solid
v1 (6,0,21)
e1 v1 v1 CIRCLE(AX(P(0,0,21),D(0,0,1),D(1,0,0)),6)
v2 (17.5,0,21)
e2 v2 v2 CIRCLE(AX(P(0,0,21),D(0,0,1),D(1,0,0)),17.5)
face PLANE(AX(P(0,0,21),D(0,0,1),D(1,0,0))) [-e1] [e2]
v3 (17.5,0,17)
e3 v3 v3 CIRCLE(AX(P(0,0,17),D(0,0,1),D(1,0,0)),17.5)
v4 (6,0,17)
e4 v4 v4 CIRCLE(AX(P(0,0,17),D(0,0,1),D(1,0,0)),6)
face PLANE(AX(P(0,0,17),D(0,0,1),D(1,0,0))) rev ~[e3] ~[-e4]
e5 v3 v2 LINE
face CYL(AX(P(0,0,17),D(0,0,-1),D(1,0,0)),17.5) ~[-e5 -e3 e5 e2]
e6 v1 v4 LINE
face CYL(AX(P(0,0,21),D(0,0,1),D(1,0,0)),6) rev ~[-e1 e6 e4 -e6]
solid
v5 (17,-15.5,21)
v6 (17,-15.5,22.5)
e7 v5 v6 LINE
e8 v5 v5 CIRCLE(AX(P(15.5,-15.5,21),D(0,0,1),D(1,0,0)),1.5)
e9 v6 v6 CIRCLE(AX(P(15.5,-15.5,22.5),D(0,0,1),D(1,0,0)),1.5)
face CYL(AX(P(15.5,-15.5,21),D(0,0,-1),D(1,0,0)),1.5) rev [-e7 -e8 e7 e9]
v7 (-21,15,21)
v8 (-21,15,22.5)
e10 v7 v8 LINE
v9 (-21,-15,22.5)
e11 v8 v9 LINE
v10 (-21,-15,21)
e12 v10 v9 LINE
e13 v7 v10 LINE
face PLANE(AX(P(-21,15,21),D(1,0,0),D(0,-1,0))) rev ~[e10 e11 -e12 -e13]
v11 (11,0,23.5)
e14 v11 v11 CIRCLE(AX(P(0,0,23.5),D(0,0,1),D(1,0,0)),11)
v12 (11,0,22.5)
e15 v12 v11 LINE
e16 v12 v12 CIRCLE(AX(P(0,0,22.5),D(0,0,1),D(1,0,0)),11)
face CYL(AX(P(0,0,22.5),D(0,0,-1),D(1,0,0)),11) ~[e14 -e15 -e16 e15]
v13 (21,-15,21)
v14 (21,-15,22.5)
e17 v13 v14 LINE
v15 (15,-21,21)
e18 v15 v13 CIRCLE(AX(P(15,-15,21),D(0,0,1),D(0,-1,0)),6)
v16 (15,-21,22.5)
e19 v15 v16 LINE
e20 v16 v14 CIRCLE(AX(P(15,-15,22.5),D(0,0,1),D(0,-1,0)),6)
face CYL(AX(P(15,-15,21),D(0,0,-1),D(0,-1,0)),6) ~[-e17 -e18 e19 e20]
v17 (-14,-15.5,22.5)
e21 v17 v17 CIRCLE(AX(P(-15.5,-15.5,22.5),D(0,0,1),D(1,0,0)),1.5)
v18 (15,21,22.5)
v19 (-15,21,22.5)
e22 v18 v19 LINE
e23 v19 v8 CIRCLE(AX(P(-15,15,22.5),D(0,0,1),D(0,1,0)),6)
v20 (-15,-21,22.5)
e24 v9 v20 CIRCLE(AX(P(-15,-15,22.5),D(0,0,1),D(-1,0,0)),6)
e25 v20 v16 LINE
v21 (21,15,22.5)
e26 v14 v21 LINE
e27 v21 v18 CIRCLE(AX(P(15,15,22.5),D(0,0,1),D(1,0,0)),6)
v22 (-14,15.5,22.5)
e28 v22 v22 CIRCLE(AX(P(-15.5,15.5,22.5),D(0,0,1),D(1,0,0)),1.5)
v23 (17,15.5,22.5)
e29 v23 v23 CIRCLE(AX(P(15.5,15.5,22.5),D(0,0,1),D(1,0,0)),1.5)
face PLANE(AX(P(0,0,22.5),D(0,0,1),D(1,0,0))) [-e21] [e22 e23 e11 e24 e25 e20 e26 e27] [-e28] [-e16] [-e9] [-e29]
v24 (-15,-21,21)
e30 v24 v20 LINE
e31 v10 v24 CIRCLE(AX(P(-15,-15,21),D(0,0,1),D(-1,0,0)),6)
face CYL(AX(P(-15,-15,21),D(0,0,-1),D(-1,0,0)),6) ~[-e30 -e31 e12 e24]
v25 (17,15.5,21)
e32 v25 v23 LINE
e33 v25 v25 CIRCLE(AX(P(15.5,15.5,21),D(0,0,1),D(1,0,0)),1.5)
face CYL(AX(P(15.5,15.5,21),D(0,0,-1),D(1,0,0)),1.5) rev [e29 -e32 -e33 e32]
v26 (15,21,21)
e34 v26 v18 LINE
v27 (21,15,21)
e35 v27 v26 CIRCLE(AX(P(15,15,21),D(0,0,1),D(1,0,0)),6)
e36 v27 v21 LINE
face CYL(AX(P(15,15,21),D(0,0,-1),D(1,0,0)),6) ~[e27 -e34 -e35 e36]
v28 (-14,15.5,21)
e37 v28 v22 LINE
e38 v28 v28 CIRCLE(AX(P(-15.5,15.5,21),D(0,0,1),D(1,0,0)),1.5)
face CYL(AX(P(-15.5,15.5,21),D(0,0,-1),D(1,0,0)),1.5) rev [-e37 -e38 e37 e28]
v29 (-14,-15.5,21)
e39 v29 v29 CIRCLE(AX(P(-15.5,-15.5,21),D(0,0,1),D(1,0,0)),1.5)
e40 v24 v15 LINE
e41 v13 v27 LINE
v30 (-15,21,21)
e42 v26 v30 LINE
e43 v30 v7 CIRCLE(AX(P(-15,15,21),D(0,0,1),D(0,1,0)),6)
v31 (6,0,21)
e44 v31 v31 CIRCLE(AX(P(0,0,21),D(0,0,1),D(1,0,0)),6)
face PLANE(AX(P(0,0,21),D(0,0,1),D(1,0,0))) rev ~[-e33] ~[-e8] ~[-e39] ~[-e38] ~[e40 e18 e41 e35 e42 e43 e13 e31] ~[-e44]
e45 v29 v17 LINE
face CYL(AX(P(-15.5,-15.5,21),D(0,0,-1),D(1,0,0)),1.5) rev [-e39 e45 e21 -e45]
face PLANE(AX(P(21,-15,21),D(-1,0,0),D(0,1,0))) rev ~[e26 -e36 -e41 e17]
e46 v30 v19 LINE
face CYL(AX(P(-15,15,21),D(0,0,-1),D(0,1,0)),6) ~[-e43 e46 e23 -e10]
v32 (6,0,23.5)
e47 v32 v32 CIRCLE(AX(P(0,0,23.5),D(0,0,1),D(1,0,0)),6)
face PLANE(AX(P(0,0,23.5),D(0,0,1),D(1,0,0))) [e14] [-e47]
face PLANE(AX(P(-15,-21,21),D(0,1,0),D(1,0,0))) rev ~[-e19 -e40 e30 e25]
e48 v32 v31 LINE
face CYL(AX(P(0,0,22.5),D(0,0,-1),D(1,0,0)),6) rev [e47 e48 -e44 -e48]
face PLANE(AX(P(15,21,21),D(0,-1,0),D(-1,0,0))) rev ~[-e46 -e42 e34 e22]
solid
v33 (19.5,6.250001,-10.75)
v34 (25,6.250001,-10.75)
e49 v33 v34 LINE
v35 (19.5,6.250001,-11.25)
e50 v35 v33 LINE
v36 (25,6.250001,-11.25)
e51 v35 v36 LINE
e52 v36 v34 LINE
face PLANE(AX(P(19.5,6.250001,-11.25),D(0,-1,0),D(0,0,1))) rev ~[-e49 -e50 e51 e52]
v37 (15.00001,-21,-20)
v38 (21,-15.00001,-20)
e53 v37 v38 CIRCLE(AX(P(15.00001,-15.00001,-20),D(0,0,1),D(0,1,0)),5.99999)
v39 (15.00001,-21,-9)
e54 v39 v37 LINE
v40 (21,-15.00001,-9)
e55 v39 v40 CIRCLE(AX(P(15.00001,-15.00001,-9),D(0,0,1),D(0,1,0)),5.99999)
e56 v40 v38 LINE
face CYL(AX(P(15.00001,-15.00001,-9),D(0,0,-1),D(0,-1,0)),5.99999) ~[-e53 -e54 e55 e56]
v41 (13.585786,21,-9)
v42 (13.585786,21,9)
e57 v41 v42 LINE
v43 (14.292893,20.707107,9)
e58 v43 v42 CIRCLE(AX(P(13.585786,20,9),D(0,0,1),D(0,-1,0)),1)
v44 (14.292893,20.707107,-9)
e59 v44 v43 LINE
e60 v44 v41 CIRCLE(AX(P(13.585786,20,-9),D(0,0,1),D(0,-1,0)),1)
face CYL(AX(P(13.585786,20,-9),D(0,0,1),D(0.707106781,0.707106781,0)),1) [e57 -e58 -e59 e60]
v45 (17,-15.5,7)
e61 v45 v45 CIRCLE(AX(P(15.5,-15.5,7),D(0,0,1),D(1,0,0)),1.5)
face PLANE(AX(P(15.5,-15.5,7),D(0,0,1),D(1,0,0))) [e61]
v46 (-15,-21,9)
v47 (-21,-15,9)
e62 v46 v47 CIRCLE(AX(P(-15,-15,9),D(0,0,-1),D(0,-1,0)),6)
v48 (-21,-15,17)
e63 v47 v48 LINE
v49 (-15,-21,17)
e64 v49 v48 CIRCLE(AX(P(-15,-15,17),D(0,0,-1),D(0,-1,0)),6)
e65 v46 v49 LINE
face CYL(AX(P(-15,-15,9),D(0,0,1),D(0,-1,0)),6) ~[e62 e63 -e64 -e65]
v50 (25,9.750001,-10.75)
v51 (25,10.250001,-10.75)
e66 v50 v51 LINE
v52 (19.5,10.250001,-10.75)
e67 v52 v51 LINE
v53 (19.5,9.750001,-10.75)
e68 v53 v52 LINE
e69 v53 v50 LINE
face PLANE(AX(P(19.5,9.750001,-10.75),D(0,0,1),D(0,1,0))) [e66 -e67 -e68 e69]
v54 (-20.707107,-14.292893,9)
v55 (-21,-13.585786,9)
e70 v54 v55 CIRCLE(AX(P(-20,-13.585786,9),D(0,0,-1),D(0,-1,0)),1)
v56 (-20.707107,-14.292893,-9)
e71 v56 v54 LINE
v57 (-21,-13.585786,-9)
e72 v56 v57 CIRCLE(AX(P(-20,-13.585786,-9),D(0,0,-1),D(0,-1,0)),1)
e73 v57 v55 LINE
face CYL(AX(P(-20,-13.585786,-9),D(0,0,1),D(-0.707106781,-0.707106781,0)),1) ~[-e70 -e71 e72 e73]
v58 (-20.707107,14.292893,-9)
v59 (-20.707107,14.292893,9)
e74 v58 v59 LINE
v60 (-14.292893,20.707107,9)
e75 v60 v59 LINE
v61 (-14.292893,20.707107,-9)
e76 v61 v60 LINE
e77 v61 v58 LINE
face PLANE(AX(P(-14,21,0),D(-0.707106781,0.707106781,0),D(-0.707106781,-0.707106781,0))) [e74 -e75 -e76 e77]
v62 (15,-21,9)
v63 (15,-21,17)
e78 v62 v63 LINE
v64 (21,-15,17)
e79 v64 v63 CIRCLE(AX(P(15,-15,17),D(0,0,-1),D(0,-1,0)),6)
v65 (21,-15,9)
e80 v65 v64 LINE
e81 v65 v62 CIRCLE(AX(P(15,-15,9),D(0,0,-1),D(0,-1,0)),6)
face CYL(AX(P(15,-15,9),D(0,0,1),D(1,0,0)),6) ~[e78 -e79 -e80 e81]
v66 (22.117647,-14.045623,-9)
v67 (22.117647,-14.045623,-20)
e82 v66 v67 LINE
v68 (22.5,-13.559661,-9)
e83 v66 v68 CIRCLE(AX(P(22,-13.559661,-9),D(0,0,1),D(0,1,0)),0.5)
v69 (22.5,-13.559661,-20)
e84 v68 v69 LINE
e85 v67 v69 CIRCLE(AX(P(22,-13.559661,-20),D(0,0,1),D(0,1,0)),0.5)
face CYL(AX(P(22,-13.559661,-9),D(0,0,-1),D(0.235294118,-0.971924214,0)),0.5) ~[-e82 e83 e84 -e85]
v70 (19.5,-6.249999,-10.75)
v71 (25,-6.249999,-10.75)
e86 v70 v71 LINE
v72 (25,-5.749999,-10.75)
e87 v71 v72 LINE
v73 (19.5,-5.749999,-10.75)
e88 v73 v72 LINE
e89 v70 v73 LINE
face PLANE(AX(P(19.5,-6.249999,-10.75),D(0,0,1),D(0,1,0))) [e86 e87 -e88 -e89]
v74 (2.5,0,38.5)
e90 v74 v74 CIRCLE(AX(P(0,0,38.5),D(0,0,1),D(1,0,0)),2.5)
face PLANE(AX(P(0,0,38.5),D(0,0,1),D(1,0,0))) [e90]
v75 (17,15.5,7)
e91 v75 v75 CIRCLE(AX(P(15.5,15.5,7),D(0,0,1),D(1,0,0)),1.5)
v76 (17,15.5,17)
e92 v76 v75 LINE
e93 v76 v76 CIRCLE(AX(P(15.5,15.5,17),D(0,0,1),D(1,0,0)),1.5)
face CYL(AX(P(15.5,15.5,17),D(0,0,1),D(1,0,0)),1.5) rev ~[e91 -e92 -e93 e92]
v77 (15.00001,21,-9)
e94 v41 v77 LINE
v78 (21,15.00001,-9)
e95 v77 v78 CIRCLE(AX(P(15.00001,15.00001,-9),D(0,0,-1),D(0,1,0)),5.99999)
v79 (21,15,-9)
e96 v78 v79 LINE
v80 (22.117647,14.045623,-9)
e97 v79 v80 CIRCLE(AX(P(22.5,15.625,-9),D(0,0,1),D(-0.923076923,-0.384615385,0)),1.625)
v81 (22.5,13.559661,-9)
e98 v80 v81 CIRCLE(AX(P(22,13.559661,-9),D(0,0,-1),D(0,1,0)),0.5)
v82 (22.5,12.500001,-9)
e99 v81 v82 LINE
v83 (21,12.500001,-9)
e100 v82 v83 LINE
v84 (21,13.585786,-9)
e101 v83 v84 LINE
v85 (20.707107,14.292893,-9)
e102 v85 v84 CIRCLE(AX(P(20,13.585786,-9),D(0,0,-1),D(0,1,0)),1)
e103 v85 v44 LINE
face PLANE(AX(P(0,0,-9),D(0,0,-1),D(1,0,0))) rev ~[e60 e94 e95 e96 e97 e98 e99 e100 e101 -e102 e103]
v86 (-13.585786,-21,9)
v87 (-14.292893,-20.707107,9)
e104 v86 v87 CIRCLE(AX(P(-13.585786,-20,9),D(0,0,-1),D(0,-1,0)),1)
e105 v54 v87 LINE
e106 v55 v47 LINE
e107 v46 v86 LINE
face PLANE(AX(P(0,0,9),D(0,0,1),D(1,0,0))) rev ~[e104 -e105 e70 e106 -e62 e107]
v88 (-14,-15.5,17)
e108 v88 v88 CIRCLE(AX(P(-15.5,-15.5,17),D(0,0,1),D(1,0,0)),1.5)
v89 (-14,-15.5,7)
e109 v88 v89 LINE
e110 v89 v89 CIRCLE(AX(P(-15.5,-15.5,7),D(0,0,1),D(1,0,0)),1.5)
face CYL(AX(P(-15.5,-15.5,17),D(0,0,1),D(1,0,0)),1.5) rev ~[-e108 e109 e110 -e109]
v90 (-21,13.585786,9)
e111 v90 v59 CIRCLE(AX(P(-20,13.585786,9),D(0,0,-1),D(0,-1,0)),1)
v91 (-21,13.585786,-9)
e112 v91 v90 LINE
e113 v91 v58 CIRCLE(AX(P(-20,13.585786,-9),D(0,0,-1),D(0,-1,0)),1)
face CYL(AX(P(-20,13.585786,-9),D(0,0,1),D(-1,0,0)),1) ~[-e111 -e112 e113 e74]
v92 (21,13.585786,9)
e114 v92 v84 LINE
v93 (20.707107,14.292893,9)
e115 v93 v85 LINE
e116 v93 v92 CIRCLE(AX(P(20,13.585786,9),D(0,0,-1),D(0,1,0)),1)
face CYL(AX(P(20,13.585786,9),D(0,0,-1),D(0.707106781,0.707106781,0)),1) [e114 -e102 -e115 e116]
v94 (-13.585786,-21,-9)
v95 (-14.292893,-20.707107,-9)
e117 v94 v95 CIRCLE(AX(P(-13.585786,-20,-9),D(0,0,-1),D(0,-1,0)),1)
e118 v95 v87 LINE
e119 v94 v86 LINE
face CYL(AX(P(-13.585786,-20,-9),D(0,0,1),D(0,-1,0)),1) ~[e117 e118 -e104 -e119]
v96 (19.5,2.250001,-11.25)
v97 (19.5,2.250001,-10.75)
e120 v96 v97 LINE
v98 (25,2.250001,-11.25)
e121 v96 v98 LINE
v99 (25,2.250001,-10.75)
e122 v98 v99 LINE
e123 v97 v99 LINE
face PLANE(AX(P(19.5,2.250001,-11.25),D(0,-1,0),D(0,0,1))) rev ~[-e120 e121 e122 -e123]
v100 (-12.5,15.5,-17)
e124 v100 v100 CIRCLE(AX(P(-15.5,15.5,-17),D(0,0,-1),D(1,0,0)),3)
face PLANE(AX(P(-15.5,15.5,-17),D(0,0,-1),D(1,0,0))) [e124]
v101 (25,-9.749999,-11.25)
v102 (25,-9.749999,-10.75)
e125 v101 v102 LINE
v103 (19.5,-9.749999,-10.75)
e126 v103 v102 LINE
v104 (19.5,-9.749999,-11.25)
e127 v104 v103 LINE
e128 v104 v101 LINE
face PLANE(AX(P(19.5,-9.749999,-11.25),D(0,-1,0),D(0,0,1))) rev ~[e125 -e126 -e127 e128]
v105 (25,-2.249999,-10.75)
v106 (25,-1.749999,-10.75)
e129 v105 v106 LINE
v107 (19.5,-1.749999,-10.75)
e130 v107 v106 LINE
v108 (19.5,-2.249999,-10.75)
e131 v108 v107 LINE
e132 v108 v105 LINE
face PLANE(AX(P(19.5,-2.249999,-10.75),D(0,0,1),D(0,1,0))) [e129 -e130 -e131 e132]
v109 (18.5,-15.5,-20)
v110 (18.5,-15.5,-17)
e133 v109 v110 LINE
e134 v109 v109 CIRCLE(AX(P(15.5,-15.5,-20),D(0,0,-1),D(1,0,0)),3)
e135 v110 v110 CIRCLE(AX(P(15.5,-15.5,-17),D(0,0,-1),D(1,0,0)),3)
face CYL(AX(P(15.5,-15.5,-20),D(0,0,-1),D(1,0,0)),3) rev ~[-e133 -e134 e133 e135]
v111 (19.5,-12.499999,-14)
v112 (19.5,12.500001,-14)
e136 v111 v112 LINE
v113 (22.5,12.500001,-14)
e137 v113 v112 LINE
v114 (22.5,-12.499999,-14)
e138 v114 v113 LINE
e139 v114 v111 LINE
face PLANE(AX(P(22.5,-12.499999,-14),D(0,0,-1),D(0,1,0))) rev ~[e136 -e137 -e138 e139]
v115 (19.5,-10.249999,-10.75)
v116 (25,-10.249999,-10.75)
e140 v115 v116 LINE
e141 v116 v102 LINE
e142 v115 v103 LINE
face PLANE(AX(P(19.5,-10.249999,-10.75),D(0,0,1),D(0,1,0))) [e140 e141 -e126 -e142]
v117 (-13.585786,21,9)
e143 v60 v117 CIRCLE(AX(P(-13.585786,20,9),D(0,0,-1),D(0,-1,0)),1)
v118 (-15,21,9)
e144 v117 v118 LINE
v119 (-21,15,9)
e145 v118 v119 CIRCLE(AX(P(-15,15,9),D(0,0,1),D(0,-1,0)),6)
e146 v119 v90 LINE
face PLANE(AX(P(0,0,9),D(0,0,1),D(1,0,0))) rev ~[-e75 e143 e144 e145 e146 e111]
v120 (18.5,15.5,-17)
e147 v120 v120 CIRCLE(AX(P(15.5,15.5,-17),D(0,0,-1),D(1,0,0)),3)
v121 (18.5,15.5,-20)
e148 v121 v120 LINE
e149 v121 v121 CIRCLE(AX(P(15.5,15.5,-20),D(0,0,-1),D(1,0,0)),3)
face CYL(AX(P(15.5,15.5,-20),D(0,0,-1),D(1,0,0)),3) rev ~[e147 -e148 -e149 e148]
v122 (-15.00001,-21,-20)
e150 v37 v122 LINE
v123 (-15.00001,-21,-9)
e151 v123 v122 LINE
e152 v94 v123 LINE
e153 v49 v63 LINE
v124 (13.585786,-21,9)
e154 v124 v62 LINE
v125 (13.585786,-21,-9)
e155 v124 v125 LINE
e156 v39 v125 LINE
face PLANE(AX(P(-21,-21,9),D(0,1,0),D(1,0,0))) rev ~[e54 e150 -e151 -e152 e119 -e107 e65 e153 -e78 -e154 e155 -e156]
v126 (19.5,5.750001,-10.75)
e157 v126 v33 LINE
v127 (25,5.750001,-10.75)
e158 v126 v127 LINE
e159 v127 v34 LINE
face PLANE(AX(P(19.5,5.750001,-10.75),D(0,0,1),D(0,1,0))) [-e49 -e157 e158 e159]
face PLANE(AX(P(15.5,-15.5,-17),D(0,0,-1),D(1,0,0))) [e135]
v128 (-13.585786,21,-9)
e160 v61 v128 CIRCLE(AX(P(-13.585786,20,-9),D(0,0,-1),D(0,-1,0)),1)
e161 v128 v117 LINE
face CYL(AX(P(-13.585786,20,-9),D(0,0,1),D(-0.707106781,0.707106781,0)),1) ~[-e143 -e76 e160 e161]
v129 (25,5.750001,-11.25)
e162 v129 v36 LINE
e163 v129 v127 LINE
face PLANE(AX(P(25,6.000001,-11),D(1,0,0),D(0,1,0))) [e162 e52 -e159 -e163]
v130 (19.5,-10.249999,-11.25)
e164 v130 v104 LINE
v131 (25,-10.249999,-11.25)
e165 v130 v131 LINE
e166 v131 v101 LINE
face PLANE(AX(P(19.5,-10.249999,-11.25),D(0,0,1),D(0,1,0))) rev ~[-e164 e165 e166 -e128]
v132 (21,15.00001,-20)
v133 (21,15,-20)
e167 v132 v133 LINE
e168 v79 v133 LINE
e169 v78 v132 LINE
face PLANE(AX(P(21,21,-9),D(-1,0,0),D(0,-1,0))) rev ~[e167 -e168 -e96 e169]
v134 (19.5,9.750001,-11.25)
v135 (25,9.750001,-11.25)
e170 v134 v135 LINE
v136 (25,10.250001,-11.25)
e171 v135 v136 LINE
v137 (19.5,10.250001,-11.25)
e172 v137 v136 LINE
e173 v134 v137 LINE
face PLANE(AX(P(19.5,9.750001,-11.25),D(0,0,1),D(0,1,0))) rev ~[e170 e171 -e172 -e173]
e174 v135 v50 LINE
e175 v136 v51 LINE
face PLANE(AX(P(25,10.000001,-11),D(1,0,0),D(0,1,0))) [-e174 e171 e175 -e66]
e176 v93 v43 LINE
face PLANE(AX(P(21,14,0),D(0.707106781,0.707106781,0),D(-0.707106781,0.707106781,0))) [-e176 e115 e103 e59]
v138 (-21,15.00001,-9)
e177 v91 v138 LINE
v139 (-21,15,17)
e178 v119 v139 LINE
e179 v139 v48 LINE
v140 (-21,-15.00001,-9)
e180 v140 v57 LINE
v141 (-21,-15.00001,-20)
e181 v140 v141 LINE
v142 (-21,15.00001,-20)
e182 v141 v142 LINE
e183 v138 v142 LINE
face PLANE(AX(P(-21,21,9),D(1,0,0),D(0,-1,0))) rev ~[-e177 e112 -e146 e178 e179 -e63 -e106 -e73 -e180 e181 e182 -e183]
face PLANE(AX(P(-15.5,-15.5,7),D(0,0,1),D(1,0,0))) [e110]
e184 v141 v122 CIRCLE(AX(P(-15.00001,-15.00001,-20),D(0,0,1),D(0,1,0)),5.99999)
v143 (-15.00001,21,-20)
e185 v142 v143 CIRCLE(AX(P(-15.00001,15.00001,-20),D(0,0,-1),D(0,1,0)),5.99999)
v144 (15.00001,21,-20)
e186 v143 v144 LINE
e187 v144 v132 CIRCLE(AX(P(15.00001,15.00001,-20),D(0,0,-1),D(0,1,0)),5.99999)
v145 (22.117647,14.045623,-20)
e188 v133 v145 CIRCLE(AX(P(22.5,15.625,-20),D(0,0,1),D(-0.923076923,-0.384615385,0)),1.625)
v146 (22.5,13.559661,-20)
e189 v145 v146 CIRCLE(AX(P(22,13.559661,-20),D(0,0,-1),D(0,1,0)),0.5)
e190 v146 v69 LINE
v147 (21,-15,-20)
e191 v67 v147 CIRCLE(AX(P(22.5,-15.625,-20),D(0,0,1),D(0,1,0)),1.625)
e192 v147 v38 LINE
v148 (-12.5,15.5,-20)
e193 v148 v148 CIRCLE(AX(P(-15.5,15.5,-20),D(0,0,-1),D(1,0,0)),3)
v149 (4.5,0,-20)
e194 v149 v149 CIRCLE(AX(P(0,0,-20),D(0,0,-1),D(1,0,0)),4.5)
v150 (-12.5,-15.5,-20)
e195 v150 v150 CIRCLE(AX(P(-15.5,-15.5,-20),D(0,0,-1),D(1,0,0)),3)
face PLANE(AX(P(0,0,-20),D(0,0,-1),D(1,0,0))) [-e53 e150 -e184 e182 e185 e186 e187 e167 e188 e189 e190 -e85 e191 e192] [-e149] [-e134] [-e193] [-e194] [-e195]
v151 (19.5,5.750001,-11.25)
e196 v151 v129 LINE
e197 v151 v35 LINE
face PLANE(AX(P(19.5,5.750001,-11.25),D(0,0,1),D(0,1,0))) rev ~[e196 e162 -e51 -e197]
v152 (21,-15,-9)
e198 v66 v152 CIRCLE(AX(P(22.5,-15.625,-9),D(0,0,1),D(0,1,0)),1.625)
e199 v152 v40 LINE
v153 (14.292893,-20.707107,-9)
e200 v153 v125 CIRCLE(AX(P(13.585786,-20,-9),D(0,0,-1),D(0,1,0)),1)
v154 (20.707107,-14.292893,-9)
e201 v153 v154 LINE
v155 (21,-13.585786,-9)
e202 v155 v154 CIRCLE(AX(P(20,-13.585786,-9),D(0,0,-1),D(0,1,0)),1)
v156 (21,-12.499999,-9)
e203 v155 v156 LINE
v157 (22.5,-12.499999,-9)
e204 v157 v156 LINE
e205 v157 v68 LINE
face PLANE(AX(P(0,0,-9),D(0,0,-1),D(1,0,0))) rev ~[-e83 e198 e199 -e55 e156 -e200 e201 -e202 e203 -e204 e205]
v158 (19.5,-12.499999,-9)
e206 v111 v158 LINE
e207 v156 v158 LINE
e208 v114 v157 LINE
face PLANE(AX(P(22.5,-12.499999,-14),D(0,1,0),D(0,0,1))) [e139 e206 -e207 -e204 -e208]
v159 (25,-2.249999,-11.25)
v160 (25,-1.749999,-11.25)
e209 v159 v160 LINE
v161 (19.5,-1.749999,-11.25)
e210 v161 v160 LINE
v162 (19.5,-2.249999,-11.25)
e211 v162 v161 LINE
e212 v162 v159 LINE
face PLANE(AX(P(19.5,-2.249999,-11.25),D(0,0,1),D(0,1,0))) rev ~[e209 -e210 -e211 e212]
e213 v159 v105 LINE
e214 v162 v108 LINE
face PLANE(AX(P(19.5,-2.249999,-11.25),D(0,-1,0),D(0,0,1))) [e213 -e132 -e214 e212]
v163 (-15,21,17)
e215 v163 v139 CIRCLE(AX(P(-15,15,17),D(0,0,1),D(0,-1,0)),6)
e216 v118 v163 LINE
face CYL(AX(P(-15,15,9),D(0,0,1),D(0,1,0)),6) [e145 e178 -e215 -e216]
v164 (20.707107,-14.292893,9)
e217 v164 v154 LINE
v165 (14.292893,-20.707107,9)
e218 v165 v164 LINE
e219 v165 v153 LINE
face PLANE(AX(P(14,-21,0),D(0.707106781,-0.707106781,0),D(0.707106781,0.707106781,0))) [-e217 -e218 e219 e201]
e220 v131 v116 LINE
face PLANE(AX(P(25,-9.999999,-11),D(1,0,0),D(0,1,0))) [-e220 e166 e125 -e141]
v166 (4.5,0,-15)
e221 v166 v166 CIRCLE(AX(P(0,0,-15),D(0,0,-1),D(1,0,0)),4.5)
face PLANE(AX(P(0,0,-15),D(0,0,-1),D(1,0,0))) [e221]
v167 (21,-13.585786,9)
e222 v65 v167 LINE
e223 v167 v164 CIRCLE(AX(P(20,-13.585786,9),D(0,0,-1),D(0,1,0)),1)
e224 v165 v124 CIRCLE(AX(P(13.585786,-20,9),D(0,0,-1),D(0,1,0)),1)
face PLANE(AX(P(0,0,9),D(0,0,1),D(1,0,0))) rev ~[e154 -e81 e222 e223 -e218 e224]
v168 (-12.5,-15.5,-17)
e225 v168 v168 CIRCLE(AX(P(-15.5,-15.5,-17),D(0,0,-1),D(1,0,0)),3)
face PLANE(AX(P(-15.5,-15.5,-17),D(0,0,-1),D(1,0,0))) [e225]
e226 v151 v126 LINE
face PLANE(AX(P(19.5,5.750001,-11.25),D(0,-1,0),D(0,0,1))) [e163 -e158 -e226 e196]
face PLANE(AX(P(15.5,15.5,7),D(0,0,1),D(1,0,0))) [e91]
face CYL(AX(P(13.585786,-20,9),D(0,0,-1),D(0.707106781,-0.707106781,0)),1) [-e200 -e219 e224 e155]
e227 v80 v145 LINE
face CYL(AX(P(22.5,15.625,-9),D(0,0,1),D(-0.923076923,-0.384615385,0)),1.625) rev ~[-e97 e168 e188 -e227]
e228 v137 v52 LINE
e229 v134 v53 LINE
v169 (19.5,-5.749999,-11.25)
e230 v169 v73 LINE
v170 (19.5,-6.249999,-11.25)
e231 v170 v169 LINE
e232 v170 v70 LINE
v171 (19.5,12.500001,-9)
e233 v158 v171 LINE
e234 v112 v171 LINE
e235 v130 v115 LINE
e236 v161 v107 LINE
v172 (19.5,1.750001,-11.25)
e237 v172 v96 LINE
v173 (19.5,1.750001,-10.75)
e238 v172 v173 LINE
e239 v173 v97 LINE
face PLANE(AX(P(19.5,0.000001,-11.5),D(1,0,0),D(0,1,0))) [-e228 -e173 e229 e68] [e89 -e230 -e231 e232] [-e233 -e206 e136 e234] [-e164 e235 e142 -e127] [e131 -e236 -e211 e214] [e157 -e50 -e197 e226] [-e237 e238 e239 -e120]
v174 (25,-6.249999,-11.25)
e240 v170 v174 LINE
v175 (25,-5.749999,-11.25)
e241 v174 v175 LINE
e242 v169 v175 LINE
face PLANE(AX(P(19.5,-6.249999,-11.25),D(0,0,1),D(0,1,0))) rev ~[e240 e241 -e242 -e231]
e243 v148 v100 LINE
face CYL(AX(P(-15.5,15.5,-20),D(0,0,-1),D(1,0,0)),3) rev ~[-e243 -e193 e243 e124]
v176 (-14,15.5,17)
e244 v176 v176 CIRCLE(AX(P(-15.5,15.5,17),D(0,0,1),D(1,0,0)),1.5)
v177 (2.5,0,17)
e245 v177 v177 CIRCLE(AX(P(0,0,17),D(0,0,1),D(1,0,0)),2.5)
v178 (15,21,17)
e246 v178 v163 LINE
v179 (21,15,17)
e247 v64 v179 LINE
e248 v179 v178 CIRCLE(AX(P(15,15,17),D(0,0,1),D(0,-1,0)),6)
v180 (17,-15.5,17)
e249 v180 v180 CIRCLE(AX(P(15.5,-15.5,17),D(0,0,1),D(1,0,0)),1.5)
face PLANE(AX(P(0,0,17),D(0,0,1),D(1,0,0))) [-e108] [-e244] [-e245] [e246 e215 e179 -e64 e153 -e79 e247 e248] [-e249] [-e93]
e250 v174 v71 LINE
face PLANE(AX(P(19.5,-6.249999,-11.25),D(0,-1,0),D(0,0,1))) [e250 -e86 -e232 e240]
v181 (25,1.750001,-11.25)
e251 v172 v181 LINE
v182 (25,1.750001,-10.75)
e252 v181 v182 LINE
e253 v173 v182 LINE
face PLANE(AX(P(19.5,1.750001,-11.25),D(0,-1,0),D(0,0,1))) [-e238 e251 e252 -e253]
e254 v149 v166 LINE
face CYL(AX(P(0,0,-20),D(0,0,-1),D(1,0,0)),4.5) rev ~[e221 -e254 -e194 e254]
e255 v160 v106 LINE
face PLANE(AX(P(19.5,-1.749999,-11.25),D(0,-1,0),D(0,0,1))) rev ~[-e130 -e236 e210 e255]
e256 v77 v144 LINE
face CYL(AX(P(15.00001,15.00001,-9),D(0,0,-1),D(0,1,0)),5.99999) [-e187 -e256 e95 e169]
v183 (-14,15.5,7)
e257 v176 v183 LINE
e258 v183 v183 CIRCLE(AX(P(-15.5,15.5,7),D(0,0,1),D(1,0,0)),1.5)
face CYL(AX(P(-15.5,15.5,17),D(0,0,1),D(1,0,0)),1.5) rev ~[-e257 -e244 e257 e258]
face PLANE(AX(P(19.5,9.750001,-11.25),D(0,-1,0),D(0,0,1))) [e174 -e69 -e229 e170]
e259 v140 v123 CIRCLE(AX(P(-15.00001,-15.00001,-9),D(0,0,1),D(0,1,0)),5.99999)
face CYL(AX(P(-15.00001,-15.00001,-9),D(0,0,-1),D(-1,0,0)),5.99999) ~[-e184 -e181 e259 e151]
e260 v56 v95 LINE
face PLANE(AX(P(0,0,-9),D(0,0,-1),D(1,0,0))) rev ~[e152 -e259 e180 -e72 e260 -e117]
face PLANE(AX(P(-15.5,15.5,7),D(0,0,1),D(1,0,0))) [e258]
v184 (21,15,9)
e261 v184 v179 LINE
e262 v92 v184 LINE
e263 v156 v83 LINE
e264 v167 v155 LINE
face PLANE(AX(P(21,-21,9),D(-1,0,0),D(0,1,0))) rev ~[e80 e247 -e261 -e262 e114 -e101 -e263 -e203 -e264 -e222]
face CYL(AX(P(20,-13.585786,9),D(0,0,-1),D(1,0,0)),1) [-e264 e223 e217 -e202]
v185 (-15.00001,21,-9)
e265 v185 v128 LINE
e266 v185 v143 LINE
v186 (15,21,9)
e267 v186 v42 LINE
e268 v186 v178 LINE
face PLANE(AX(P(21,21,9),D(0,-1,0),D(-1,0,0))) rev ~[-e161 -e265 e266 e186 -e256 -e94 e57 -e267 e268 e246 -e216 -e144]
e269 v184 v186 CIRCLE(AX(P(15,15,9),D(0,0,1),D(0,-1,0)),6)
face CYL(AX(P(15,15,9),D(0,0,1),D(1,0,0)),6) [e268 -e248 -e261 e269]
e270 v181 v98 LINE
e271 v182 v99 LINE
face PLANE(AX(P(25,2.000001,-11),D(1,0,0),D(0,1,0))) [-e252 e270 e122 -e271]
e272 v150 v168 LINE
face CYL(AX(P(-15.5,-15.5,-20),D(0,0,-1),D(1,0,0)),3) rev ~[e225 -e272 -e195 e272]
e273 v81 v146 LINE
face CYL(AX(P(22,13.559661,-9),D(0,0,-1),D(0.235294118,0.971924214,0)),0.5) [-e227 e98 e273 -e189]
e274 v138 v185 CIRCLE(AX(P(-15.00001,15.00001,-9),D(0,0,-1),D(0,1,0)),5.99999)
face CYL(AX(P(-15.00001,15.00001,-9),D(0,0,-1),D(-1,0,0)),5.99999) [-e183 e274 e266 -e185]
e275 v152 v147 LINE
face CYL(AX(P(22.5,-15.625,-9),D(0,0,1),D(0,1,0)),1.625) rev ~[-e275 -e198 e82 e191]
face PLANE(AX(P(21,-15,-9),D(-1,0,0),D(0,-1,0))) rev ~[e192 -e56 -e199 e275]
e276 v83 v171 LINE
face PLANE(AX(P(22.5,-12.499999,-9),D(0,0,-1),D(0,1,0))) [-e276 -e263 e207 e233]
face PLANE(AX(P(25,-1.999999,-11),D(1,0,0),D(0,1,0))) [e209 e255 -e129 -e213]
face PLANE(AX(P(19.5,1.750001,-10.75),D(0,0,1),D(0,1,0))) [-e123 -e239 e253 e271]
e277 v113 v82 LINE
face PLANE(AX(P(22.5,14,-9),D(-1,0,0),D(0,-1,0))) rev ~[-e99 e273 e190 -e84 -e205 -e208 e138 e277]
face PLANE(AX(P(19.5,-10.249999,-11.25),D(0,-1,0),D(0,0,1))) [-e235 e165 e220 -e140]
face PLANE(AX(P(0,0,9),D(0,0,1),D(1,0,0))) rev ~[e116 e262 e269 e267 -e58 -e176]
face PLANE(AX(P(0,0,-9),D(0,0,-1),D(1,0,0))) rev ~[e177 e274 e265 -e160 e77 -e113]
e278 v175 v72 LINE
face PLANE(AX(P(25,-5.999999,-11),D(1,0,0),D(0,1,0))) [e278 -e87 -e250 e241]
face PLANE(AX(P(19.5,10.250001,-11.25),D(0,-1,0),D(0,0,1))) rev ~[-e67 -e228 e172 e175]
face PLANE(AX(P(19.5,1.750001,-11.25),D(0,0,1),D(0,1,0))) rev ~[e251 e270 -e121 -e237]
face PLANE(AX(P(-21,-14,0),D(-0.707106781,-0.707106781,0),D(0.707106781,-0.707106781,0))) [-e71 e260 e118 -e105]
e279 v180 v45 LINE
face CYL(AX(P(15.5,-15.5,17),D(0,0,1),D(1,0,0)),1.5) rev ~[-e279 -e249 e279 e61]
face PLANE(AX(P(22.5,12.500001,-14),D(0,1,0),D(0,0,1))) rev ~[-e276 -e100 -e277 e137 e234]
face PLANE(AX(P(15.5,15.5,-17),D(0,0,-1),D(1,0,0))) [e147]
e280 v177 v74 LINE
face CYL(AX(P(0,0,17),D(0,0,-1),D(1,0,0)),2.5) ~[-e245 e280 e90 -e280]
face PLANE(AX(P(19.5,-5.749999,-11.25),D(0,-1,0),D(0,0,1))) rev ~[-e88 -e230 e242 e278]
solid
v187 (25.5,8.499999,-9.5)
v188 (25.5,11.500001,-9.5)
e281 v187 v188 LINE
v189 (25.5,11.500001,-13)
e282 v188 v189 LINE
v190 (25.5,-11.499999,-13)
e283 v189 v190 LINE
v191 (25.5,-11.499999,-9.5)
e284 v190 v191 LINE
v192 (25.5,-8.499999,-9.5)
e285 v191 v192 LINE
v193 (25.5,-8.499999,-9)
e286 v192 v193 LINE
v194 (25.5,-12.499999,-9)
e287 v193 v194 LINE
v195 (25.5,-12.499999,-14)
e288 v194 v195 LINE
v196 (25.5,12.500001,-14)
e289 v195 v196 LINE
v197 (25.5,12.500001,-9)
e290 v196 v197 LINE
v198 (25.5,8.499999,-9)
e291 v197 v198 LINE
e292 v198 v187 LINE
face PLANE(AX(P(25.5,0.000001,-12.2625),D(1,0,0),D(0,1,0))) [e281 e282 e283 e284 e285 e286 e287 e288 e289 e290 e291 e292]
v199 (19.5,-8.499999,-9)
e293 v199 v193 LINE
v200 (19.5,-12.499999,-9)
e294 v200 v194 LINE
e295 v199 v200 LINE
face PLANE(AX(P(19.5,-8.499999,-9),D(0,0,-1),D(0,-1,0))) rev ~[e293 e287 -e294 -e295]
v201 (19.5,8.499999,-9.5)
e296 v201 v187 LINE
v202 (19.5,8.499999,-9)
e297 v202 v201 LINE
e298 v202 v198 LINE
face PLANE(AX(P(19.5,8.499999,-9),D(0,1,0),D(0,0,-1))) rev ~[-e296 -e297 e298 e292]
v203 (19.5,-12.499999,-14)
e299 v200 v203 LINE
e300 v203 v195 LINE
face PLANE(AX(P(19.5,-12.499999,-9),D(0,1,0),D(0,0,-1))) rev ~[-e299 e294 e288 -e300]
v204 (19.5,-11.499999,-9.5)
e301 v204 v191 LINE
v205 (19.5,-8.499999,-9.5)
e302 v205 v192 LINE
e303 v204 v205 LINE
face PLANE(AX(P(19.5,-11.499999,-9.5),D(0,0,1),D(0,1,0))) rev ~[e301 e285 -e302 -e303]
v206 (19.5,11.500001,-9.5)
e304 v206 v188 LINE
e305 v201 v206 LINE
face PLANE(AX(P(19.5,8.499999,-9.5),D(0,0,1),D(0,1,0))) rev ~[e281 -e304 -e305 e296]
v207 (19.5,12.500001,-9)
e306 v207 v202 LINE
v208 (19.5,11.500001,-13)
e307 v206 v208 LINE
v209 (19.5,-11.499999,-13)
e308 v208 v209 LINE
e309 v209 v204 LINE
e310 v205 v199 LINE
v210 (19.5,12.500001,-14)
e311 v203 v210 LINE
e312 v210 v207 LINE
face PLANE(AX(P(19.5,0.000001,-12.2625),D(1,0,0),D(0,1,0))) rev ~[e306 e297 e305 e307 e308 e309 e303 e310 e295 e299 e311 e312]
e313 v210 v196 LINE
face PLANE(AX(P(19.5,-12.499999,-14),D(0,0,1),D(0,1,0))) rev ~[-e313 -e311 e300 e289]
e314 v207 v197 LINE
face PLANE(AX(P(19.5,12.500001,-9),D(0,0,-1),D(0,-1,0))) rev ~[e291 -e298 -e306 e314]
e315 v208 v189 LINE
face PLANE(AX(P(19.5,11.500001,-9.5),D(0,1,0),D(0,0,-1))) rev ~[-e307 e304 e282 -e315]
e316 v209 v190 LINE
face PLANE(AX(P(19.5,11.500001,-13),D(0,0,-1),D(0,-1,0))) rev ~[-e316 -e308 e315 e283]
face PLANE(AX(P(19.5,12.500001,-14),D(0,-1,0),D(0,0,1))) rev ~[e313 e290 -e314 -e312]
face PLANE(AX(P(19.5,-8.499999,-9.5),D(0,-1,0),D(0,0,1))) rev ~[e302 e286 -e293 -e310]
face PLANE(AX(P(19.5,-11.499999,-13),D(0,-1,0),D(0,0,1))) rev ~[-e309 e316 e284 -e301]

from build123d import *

# Parameters (mm, degrees)
F1_DEPTH  = 9
F2_R      = 1
F4_DEPTH  = 11
F5_R      = 5.99999
F6_R      = 0.5
F7_R      = 4.5
F8_DEPTH  = 5
F9_R      = 3
F10_DEPTH = 3
F12_DEPTH = 8
F13_R     = 6
F14_R     = 1.5
F15_DEPTH = 10
F16_R     = 17.5
F17_DEPTH = 4
F18_R     = 6
F19_DEPTH = 4
F20_R     = 2.5
F21_DEPTH = 21.5
F22_R     = 1.5
F22_R_2   = 17.5
F22_R_3   = 6
F23_DEPTH = 1.5
F24_R     = 11
F24_R_2   = 6
F25_DEPTH = 1
F26_W     = 25
F26_H     = 5
F27_DEPTH = 3
F29_DEPTH = 6
F30_W     = 0.5
F30_H     = 0.5
F31_DEPTH = 5.5


# Not quite as in the source:
# - a fillet or chamfer is up to 0.001 mm smaller than in the source, because OpenCascade refuses the exact size


with BuildPart() as f1:
    # F0 (on Top) → F1 (new body, symmetric)
    with BuildSketch(Plane.XY):
        Polygon((21, 14), (14, 21), (-14, 21), (-21, 14), (-21, -14), (-14, -21), (14, -21), (21, -14), align=None)
    extrude(amount=F1_DEPTH, both=True)

    # F2
    f2_edges = [f1.edges().sort_by_distance(p)[0] for p in [
        (-21, -14, 0),
        (-14, -21, 0),
        (14, -21, 0),
        (21, -14, 0),
        (21, 14, 0),
        (14, 21, 0),
        (-14, 21, 0),
        (-21, 14, 0),
    ]]
    fillet(f2_edges, radius=F2_R)

    # F3 (on face) → F4 (join)
    with BuildSketch(Plane(origin=(0, 0, -9), x_dir=(1, 0, 0), z_dir=(0, 0, -1))):
        with BuildLine():
            Line((13.5857864376, 21), (-13.5857864376, 21))
            ThreePointArc((-13.5857864376, 21), (-13.96846987, 20.9238795325), (-14.2928932188, 20.7071067812))
            Line((-14.2928932188, 20.7071067812), (-20.7071067812, 14.2928932188))
            ThreePointArc((-20.7071067812, 14.2928932188), (-20.9238795325, 13.96846987), (-21, 13.5857864376))
            Line((-21, 13.5857864376), (-21, -13.5857864376))
            ThreePointArc((-21, -13.5857864376), (-20.9238795325, -13.96846987), (-20.7071067812, -14.2928932188))
            Line((-20.7071067812, -14.2928932188), (-14.2928932188, -20.7071067812))
            ThreePointArc((-14.2928932188, -20.7071067812), (-13.96846987, -20.9238795325), (-13.5857864376, -21))
            Line((-13.5857864376, -21), (13.5857864376, -21))
            ThreePointArc((13.5857864376, -21), (13.96846987, -20.9238795325), (14.2928932188, -20.7071067812))
            Line((14.2928932188, -20.7071067812), (20.7071067812, -14.2928932188))
            ThreePointArc((20.7071067812, -14.2928932188), (20.9238795325, -13.96846987), (21, -13.5857864376))
            Line((21, -13.5857864376), (21, 13.5857864376))
            ThreePointArc((21, 13.5857864376), (20.9238795325, 13.96846987), (20.7071067812, 14.2928932188))
            Line((20.7071067812, 14.2928932188), (14.2928932188, 20.7071067812))
            ThreePointArc((14.2928932188, 20.7071067812), (13.96846987, 20.9238795325), (13.5857864376, 21))
        make_face()
        with BuildLine():
            ThreePointArc((14.2928932188, -20.7071067812), (13.96846987, -20.9238795325), (13.5857864376, -21))
            Line((13.5857864376, -21), (21, -21))
            Line((21, -21), (21, -15))
            Line((21, -15), (21, -14))
            Line((21, -14), (21, -13.5857864376))
            ThreePointArc((21, -13.5857864376), (20.9238795325, -13.96846987), (20.7071067812, -14.2928932188))
            Line((20.7071067812, -14.2928932188), (14.2928932188, -20.7071067812))
        make_face()
        with BuildLine():
            Line((-13.5857864376, 21), (-21, 21))
            Line((-21, 21), (-21, 13.5857864376))
            ThreePointArc((-21, 13.5857864376), (-20.9238795325, 13.96846987), (-20.7071067812, 14.2928932188))
            Line((-20.7071067812, 14.2928932188), (-14.2928932188, 20.7071067812))
            ThreePointArc((-14.2928932188, 20.7071067812), (-13.96846987, 20.9238795325), (-13.5857864376, 21))
        make_face()
        with BuildLine():
            Line((21, 21), (13.5857864376, 21))
            ThreePointArc((13.5857864376, 21), (13.96846987, 20.9238795325), (14.2928932188, 20.7071067812))
            Line((14.2928932188, 20.7071067812), (20.7071067812, 14.2928932188))
            ThreePointArc((20.7071067812, 14.2928932188), (20.9238795325, 13.96846987), (21, 13.5857864376))
            Line((21, 13.5857864376), (21, 14))
            Line((21, 14), (21, 15))
            Line((21, 15), (21, 21))
        make_face()
        with BuildLine():
            ThreePointArc((-20.7071067812, -14.2928932188), (-20.9238795325, -13.96846987), (-21, -13.5857864376))
            Line((-21, -13.5857864376), (-21, -21))
            Line((-21, -21), (-13.5857864376, -21))
            ThreePointArc((-13.5857864376, -21), (-13.96846987, -20.9238795325), (-14.2928932188, -20.7071067812))
            Line((-14.2928932188, -20.7071067812), (-20.7071067812, -14.2928932188))
        make_face()
        Polygon((22.5, 14), (21, 14), (21, 13.5857864376), (21, -13.5857864376), (21, -14), (22.5, -14), align=None)
        with BuildLine():
            ThreePointArc((22.5, 14), (21.5986121811, 14.2729182717), (21, 15))
            Line((21, 15), (21, 14))
            Line((21, 14), (22.5, 14))
        make_face()
        with BuildLine():
            ThreePointArc((21, -15), (21.5986121811, -14.2729182717), (22.5, -14))
            Line((22.5, -14), (21, -14))
            Line((21, -14), (21, -15))
        make_face()
    extrude(amount=F4_DEPTH)

    # F5 (radius 6 in the source; OpenCascade refuses exactly that, so slightly less here)
    f5_edges = [f1.edges().sort_by_distance(p)[0] for p in [
        (21, -21, -14.5),
        (21, 21, -14.5),
        (-21, 21, -14.5),
        (-21, -21, -14.5),
    ]]
    fillet(f5_edges, radius=F5_R)

    # F6
    f6_edges = [f1.edges().sort_by_distance(p)[0] for p in [
        (22.5, -14, -14.5),
        (22.5, 14, -14.5),
    ]]
    fillet(f6_edges, radius=F6_R)

    # F7 (on face) → F8 (cut)
    with BuildSketch(Plane(origin=(0, 0, -20), x_dir=(1, 0, 0), z_dir=(0, 0, -1))):
        Circle(F7_R)
    extrude(amount=-F8_DEPTH, mode=Mode.SUBTRACT)

    # F9 (on face) → F10 (cut)
    with BuildSketch(Plane(origin=(0, 0, -20), x_dir=(1, 0, 0), z_dir=(0, 0, -1))):
        with Locations((15.5, 15.5)):
            Circle(F9_R)
        with Locations((15.5, -15.5)):
            Circle(F9_R)
        with Locations((-15.5, -15.5)):
            Circle(F9_R)
        with Locations((-15.5, 15.5)):
            Circle(F9_R)
    extrude(amount=-F10_DEPTH, mode=Mode.SUBTRACT)

    # F11 (on face) → F12 (join)
    with BuildSketch(Plane.XY.offset(9)):
        with BuildLine():
            Line((-13.5857864376, -21), (13.5857864376, -21))
            ThreePointArc((13.5857864376, -21), (13.96846987, -20.9238795325), (14.2928932188, -20.7071067812))
            Line((14.2928932188, -20.7071067812), (20.7071067812, -14.2928932188))
            ThreePointArc((20.7071067812, -14.2928932188), (20.9238795325, -13.96846987), (21, -13.5857864376))
            Line((21, -13.5857864376), (21, 13.5857864376))
            ThreePointArc((21, 13.5857864376), (20.9238795325, 13.96846987), (20.7071067812, 14.2928932188))
            Line((20.7071067812, 14.2928932188), (14.2928932188, 20.7071067812))
            ThreePointArc((14.2928932188, 20.7071067812), (13.96846987, 20.9238795325), (13.5857864376, 21))
            Line((13.5857864376, 21), (-13.5857864376, 21))
            ThreePointArc((-13.5857864376, 21), (-13.96846987, 20.9238795325), (-14.2928932188, 20.7071067812))
            Line((-14.2928932188, 20.7071067812), (-20.7071067812, 14.2928932188))
            ThreePointArc((-20.7071067812, 14.2928932188), (-20.9238795325, 13.96846987), (-21, 13.5857864376))
            Line((-21, 13.5857864376), (-21, -13.5857864376))
            ThreePointArc((-21, -13.5857864376), (-20.9238795325, -13.96846987), (-20.7071067812, -14.2928932188))
            Line((-20.7071067812, -14.2928932188), (-14.2928932188, -20.7071067812))
            ThreePointArc((-14.2928932188, -20.7071067812), (-13.96846987, -20.9238795325), (-13.5857864376, -21))
        make_face()
        with BuildLine():
            Line((-21, 21), (-21, 13.5857864376))
            ThreePointArc((-21, 13.5857864376), (-20.9238795325, 13.96846987), (-20.7071067812, 14.2928932188))
            Line((-20.7071067812, 14.2928932188), (-14.2928932188, 20.7071067812))
            ThreePointArc((-14.2928932188, 20.7071067812), (-13.96846987, 20.9238795325), (-13.5857864376, 21))
            Line((-13.5857864376, 21), (-21, 21))
        make_face()
        with BuildLine():
            ThreePointArc((20.7071067812, 14.2928932188), (20.9238795325, 13.96846987), (21, 13.5857864376))
            Line((21, 13.5857864376), (21, 21))
            Line((21, 21), (13.5857864376, 21))
            ThreePointArc((13.5857864376, 21), (13.96846987, 20.9238795325), (14.2928932188, 20.7071067812))
            Line((14.2928932188, 20.7071067812), (20.7071067812, 14.2928932188))
        make_face()
        with BuildLine():
            Line((13.5857864376, -21), (21, -21))
            Line((21, -21), (21, -13.5857864376))
            ThreePointArc((21, -13.5857864376), (20.9238795325, -13.96846987), (20.7071067812, -14.2928932188))
            Line((20.7071067812, -14.2928932188), (14.2928932188, -20.7071067812))
            ThreePointArc((14.2928932188, -20.7071067812), (13.96846987, -20.9238795325), (13.5857864376, -21))
        make_face()
        with BuildLine():
            Line((-21, -21), (-13.5857864376, -21))
            ThreePointArc((-13.5857864376, -21), (-13.96846987, -20.9238795325), (-14.2928932188, -20.7071067812))
            Line((-14.2928932188, -20.7071067812), (-20.7071067812, -14.2928932188))
            ThreePointArc((-20.7071067812, -14.2928932188), (-20.9238795325, -13.96846987), (-21, -13.5857864376))
            Line((-21, -13.5857864376), (-21, -21))
        make_face()
    extrude(amount=F12_DEPTH)

    # F13
    f13_edges = [f1.edges().sort_by_distance(p)[0] for p in [
        (-21, -21, 13),
        (21, -21, 13),
        (21, 21, 13),
        (-21, 21, 13),
    ]]
    fillet(f13_edges, radius=F13_R)

    # F14 (on face) → F15 (cut)
    with BuildSketch(Plane.XY.offset(17)):
        with Locations((15.5, 15.5)):
            Circle(F14_R)
        with Locations((15.5, -15.5)):
            Circle(F14_R)
        with Locations((-15.5, -15.5)):
            Circle(F14_R)
        with Locations((-15.5, 15.5)):
            Circle(F14_R)
    extrude(amount=-F15_DEPTH, mode=Mode.SUBTRACT)

    # F20 (on face) → F21 (join)
    with BuildSketch(Plane.XY.offset(17)):
        Circle(F20_R)
    extrude(amount=F21_DEPTH)

    # F26 (on face) → F27 (cut)
    with BuildSketch(Plane.YZ.offset(22.5)):
        with Locations((1.0448e-06, -11.5)):
            Rectangle(F26_W, F26_H)
    extrude(amount=-F27_DEPTH, mode=Mode.SUBTRACT)

    # F30 (on face) → F31 (join)
    with BuildSketch(Plane.YZ.offset(19.5)):
        with Locations((-9.9999989552, -11)):
            Rectangle(F30_W, F30_H)
        with Locations((-5.9999989552, -11)):
            Rectangle(F30_W, F30_H)
        with Locations((-1.9999989552, -11)):
            Rectangle(F30_W, F30_H)
        with Locations((2.0000010448, -11)):
            Rectangle(F30_W, F30_H)
        with Locations((6.0000010448, -11)):
            Rectangle(F30_W, F30_H)
        with Locations((10.0000010448, -11)):
            Rectangle(F30_W, F30_H)
    extrude(amount=F31_DEPTH)


with BuildPart() as f17:
    # F16 (on face) → F17 (new body)
    with BuildSketch(Plane.XY.offset(17)):
        Circle(F16_R)
    extrude(amount=F17_DEPTH)

    # F18 (on face) → F19 (cut)
    with BuildSketch(Plane.XY.offset(21)):
        Circle(F18_R)
    extrude(amount=-F19_DEPTH, mode=Mode.SUBTRACT)


with BuildPart() as f23:
    # F22 (on face) → F23 (new body)
    with BuildSketch(Plane.XY.offset(21)):
        with BuildLine():
            ThreePointArc((-21, -15), (-19.2426406871, -19.2426406871), (-15, -21))
            Line((-15, -21), (15, -21))
            ThreePointArc((15, -21), (19.2426406871, -19.2426406871), (21, -15))
            Line((21, -15), (21, 15))
            ThreePointArc((21, 15), (19.2426406871, 19.2426406871), (15, 21))
            Line((15, 21), (-15, 21))
            ThreePointArc((-15, 21), (-19.2426406871, 19.2426406871), (-21, 15))
            Line((-21, 15), (-21, -15))
        make_face()
        with Locations((-15.5, -15.5)):
            Circle(F22_R, mode=Mode.SUBTRACT)
        with Locations((15.5, -15.5)):
            Circle(F22_R, mode=Mode.SUBTRACT)
        with Locations((-15.5, 15.5)):
            Circle(F22_R, mode=Mode.SUBTRACT)
        Circle(F22_R_2, mode=Mode.SUBTRACT)
        with Locations((15.5, 15.5)):
            Circle(F22_R, mode=Mode.SUBTRACT)
        Circle(F22_R_2)
        Circle(F22_R_3, mode=Mode.SUBTRACT)
    extrude(amount=F23_DEPTH)

    # F24 (on face) → F25 (join)
    with BuildSketch(Plane.XY.offset(22.5)):
        Circle(F24_R)
        Circle(F24_R_2, mode=Mode.SUBTRACT)
    extrude(amount=F25_DEPTH)


with BuildPart() as f29:
    # F28 (on face) → F29 (new body)
    with BuildSketch(Plane.YZ.offset(19.5)):
        Polygon((-8.4999989552, -9), (-12.4999989552, -9), (-12.4999989552, -14), (12.5000010448, -14), (12.5000010448, -9), (8.4999989552, -9), (8.4999989552, -9.5), (11.5000010448, -9.5), (11.5000010448, -13), (-11.4999989552, -13), (-11.4999989552, -9.5), (-8.4999989552, -9.5), align=None)
    extrude(amount=F29_DEPTH)


solid = Compound([f1.part, f17.part, f23.part, f29.part])
